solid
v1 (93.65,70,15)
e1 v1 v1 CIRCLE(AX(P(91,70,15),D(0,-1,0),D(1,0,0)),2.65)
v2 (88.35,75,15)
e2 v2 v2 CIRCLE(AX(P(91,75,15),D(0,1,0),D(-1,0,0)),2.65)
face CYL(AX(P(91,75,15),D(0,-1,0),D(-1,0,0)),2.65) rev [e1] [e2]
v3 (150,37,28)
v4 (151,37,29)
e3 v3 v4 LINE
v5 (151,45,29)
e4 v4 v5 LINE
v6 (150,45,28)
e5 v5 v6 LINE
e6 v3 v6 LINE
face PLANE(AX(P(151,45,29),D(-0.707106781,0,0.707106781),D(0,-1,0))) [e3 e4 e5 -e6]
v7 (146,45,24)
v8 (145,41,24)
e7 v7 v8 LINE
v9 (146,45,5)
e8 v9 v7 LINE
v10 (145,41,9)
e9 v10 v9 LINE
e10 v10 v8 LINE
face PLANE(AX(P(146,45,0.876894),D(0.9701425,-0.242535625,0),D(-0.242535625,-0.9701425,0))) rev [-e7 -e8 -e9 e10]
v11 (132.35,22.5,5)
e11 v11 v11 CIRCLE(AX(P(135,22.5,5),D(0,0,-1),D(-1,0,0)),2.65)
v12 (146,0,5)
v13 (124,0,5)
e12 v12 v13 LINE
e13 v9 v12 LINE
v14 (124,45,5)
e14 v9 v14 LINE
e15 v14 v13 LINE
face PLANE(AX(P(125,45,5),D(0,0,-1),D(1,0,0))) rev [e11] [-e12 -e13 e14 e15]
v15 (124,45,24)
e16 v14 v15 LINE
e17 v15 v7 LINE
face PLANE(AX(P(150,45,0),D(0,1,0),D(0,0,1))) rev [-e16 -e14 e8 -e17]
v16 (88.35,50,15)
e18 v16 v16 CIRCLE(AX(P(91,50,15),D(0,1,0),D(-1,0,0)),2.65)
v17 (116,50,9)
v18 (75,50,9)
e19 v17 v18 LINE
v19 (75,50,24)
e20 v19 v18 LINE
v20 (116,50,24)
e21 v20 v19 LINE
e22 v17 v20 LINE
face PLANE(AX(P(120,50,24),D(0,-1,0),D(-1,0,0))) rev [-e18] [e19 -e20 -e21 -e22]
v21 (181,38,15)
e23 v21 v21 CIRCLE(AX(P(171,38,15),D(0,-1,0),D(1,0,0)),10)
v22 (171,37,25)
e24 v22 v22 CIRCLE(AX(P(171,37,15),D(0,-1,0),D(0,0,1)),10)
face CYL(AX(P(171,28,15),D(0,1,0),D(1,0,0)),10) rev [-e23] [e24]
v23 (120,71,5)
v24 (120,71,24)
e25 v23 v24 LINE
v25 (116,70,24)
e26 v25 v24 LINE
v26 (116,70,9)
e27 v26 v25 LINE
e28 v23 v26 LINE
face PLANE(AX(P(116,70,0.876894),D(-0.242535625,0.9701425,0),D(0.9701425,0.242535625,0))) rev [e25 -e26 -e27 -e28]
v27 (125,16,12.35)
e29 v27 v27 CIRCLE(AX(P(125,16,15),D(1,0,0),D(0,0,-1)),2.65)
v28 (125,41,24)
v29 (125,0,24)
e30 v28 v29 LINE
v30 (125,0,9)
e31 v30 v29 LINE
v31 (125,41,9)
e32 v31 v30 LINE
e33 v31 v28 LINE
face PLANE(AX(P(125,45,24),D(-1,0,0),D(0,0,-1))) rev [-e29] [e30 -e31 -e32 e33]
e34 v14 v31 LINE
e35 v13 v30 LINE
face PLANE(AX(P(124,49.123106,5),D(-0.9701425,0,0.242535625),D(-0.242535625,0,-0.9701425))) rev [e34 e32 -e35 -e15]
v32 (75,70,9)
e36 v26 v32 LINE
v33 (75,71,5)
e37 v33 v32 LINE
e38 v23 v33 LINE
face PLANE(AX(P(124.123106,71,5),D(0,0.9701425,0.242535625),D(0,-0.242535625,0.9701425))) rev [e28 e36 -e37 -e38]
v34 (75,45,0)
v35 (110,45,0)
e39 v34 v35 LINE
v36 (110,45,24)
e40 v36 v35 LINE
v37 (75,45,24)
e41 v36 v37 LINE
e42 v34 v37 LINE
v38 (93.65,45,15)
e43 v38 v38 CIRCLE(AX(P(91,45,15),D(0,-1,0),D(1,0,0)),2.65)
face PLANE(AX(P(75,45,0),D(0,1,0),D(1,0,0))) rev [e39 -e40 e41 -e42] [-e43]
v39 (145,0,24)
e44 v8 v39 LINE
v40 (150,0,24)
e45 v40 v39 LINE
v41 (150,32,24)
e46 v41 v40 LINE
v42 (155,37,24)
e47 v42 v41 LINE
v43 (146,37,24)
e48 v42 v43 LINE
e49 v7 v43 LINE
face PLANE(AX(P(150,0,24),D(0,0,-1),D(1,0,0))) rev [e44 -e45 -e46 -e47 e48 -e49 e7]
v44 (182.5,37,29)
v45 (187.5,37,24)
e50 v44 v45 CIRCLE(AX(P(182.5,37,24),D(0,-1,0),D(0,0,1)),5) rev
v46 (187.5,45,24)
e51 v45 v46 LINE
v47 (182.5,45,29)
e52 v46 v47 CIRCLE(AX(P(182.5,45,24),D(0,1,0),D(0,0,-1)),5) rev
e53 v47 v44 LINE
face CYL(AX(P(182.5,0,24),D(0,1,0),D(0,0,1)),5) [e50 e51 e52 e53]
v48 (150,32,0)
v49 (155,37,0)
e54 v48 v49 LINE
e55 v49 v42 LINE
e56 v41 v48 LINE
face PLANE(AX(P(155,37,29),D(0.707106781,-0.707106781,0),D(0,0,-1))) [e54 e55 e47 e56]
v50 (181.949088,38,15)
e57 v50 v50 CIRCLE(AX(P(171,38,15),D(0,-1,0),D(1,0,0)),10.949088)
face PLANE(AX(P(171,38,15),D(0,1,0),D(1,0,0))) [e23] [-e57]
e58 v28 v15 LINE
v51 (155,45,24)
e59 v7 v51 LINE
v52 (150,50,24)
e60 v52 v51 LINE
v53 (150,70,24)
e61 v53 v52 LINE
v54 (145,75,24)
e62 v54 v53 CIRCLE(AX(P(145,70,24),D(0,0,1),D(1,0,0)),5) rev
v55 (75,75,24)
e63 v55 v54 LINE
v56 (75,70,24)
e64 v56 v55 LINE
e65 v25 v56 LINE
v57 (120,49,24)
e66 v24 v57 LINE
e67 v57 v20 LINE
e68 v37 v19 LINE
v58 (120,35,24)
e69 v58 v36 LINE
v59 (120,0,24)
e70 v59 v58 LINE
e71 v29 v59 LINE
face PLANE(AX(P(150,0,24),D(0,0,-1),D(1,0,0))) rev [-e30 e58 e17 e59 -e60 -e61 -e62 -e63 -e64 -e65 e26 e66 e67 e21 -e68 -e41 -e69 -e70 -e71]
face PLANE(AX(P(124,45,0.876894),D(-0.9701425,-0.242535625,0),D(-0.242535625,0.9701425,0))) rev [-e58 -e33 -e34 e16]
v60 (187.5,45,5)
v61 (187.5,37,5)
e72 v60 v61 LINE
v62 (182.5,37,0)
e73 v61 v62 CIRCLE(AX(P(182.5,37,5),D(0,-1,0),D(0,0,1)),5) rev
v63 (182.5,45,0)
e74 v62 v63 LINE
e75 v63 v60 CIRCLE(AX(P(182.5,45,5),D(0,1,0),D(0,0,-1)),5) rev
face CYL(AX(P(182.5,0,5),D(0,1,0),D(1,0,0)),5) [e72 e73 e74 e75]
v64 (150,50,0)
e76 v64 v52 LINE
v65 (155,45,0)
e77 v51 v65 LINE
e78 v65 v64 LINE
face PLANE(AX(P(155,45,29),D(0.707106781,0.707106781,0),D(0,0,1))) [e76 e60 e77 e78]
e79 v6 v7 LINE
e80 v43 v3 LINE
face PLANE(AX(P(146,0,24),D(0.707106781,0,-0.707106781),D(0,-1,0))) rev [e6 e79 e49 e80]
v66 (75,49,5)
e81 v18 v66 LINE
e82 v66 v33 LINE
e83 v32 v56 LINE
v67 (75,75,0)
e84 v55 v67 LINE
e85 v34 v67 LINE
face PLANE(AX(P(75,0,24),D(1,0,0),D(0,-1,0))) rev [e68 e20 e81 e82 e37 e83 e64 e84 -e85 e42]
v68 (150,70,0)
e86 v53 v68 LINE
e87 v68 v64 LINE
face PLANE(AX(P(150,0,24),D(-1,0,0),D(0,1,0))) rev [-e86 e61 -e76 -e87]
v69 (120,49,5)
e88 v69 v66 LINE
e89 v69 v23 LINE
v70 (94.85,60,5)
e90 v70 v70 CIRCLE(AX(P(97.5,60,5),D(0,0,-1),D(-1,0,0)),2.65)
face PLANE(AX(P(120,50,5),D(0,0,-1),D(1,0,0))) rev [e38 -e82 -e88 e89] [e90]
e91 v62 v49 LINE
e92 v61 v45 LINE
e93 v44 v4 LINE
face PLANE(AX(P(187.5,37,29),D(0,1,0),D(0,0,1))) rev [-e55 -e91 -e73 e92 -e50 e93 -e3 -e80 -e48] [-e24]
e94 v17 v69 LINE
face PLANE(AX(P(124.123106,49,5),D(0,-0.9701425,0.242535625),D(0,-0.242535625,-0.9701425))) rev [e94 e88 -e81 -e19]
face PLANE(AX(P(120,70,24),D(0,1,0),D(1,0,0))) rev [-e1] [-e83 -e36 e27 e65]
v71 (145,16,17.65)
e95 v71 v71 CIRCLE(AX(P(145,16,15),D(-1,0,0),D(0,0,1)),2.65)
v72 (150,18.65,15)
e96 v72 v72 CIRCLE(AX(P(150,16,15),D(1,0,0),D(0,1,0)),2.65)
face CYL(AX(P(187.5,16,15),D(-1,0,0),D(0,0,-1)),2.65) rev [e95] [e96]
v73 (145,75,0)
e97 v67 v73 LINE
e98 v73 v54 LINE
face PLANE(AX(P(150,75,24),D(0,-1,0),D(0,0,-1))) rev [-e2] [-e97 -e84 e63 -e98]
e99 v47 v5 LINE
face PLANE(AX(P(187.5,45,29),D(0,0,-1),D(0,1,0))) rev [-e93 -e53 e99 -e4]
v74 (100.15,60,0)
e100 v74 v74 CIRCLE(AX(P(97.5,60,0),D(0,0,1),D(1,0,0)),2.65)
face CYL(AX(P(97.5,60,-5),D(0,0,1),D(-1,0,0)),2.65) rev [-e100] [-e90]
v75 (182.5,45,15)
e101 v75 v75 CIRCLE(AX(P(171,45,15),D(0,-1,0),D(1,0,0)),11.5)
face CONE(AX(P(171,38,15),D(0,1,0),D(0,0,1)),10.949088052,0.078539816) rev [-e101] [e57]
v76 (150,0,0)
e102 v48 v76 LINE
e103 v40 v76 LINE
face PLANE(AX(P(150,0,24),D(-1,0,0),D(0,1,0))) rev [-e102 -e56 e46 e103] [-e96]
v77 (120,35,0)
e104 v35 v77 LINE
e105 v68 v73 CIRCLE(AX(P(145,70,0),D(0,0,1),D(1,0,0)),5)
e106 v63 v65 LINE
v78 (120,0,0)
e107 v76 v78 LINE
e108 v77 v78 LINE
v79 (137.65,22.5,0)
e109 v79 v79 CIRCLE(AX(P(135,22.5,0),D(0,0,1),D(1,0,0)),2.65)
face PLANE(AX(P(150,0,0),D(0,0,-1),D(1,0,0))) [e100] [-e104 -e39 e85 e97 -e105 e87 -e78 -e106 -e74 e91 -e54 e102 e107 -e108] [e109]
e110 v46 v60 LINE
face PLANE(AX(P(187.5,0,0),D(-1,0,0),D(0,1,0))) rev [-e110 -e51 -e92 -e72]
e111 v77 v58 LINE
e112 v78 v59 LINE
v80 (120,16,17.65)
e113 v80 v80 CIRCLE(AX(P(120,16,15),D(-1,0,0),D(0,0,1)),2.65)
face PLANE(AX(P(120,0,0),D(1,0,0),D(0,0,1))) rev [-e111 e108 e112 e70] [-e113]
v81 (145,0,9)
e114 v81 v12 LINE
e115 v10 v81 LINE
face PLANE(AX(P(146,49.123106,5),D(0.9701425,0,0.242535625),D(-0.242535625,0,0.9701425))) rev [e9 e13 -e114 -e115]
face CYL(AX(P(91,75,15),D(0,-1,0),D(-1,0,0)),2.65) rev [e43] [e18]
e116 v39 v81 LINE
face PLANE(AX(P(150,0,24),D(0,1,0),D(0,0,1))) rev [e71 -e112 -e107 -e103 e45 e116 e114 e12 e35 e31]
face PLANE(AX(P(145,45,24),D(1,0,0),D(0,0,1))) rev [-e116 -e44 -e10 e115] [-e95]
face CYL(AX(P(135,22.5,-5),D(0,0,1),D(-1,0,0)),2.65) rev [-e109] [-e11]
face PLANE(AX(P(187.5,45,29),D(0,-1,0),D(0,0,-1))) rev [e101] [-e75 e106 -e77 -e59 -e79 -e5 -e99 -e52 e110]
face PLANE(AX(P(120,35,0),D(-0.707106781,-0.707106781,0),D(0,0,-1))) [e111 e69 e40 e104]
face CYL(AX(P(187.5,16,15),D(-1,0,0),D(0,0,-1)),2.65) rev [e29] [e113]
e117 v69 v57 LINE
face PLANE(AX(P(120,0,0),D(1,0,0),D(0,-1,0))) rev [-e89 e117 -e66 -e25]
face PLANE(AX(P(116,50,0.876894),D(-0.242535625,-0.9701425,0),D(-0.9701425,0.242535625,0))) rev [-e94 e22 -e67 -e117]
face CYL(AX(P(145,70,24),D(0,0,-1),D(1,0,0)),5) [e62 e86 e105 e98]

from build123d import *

# Parameters (mm, degrees)
SKETCH1_W               = 75
SKETCH1_H               = 75
BOSS_EXTRUDE1_DEPTH     = 24
SKETCH2_W               = 20
SKETCH2_H               = 19
CUT_EXTRUDE1_DEPTH      = 45
SKETCH3_W               = 19
SKETCH3_H               = 20
CUT_EXTRUDE2_DEPTH      = 45
CUT_EXTRUDE3_DEPTH      = 109.747413762
CUT_EXTRUDE3_DEPTH_BACK = 109.747413762
SKETCH4_W               = 45
SKETCH4_H               = 45
FILLET1_R               = 5
CHAMFER1_SIZE           = 10
SKETCH5_W               = 29
SKETCH5_H               = 8
BOSS_EXTRUDE2_DEPTH     = 37.5
SKETCH6_R               = 11.5
CUT_EXTRUDE4_DEPTH      = 7
FILLET2_R               = 5
CHAMFER3_SIZE           = 5
CUT_EXTRUDE5_DEPTH      = 93.146622293
CUT_EXTRUDE5_DEPTH_BACK = 93.146622293
SKETCH7_R               = 2.65
CUT_EXTRUDE6_DEPTH      = 105.986903945
CUT_EXTRUDE6_DEPTH_BACK = 105.986903945
SKETCH8_R               = 2.65
SKETCH9_R               = 2.65
CUT_EXTRUDE7_DEPTH      = 10
SKETCH10_R              = 2.65
CUT_EXTRUDE8_DEPTH      = 10
CUT_EXTRUDE12_DEPTH     = 19
CUT_EXTRUDE13_REACH     = 111.959
CUT_EXTRUDE14_REACH     = 140.283
SKETCH14_R              = 10
CUT_EXTRUDE15_DEPTH     = 10
CHAMFER5_SIZE           = 4
CHAMFER6_SIZE           = 1
CHAMFER8_SIZE2          = 0.550911948
CHAMFER8_SIZE           = 7


with BuildPart() as part:
    # Sketch1 → Boss-Extrude1 (new body)
    with BuildSketch(Plane.XY):
        with Locations((37.5, 37.5)):
            Rectangle(SKETCH1_W, SKETCH1_H)
    extrude(amount=BOSS_EXTRUDE1_DEPTH)

    # Sketch2 → Cut-Extrude1 (cut)
    with BuildSketch(Plane.XZ):
        with Locations((15, 14.5)):
            Rectangle(SKETCH2_W, SKETCH2_H)
    extrude(amount=-CUT_EXTRUDE1_DEPTH, mode=Mode.SUBTRACT)

    # Sketch3 → Cut-Extrude2 (cut)
    with BuildSketch(Plane(origin=(75, 0, 0), x_dir=(0, 0, -1), z_dir=(1, 0, 0))):
        with Locations((-14.5, 60)):
            Rectangle(SKETCH3_W, SKETCH3_H)
    extrude(amount=-CUT_EXTRUDE2_DEPTH, mode=Mode.SUBTRACT)

    # Sketch4 → Cut-Extrude3 (cut, two sides: drawn at the far end of the back side and taken through both)
    with BuildSketch(Plane.XY.offset(24).offset(-CUT_EXTRUDE3_DEPTH_BACK)):
        with Locations((52.5, 22.5)):
            Rectangle(SKETCH4_W, SKETCH4_H)
    extrude(amount=CUT_EXTRUDE3_DEPTH + CUT_EXTRUDE3_DEPTH_BACK, mode=Mode.SUBTRACT)

    # Fillet1
    fillet1_edges = [part.edges().sort_by_distance(p)[0] for p in [
        (0, 75, 12),
    ]]
    fillet(fillet1_edges, radius=FILLET1_R)

    # Chamfer1
    chamfer1_edges = [part.edges().sort_by_distance(p)[0] for p in [
        (30, 45, 12),
    ]]
    chamfer(chamfer1_edges, length=CHAMFER1_SIZE)

    # Sketch5 → Boss-Extrude2 (add)
    with BuildSketch(Plane.ZY):
        with Locations((14.5, 41)):
            Rectangle(SKETCH5_W, SKETCH5_H)
    extrude(amount=BOSS_EXTRUDE2_DEPTH)

    # Sketch6 → Cut-Extrude4 (cut)
    with BuildSketch(Plane(origin=(0, 45, 0), x_dir=(1, 0, 0), z_dir=(0, 1, 0))):
        with Locations(Location((-21, -15.000000001, 0), (0, 0, 180))):
            Circle(SKETCH6_R)
    extrude(amount=-CUT_EXTRUDE4_DEPTH, mode=Mode.SUBTRACT)

    # Fillet2
    fillet2_edges = [part.edges().sort_by_distance(p)[0] for p in [
        (-37.5, 41, 29),
        (-37.5, 41, 0),
    ]]
    fillet(fillet2_edges, radius=FILLET2_R)

    # Chamfer3
    chamfer3_edges = [part.edges().sort_by_distance(p)[0] for p in [
        (0, 45, 12),
        (0, 37, 12),
    ]]
    chamfer(chamfer3_edges, length=CHAMFER3_SIZE)

    # Sketch7 → Cut-Extrude5 (cut, two sides: drawn at the far end of the back side and taken through both)
    with BuildSketch(Plane.XZ.offset(-45).offset(-CUT_EXTRUDE5_DEPTH_BACK)):
        with Locations((59, 15)):
            Circle(SKETCH7_R)
    extrude(amount=CUT_EXTRUDE5_DEPTH + CUT_EXTRUDE5_DEPTH_BACK, mode=Mode.SUBTRACT)

    # Sketch8 → Cut-Extrude6 (cut, two sides: drawn at the far end of the back side and taken through both)
    with BuildSketch(Plane(origin=(30, 0, 0), x_dir=(0, 0, -1), z_dir=(1, 0, 0)).offset(-CUT_EXTRUDE6_DEPTH_BACK)):
        with Locations((-15, 16)):
            Circle(SKETCH8_R)
    extrude(amount=CUT_EXTRUDE6_DEPTH + CUT_EXTRUDE6_DEPTH_BACK, mode=Mode.SUBTRACT)

    # Sketch9 → Cut-Extrude7 (cut)
    with BuildSketch(Plane.XY.offset(5)):
        with Locations((15, 22.5)):
            Circle(SKETCH9_R)
    extrude(amount=-CUT_EXTRUDE7_DEPTH, mode=Mode.SUBTRACT)

    # Sketch10 → Cut-Extrude8 (cut)
    with BuildSketch(Plane.XY.offset(5)):
        with Locations((52.5, 60)):
            Circle(SKETCH10_R)
    extrude(amount=-CUT_EXTRUDE8_DEPTH, mode=Mode.SUBTRACT)

    # Sketch11 → Cut-Extrude12 (cut)
    with BuildSketch(Plane.XY.offset(24)):
        Polygon((34, 70), (30, 71), (30, 70), align=None)
        Polygon((30, 50), (34, 50), (30, 49), align=None)
        Polygon((26, 45), (25, 41), (25, 45), align=None)
        Polygon((5, 45), (4, 45), (5, 41), align=None)
    extrude(amount=-CUT_EXTRUDE12_DEPTH, mode=Mode.SUBTRACT)

    # Cut-Extrude13: up to this face of the body (flat: up to its plane)
    cut_extrude13_end = Plane(part.part.faces().sort_by_distance((15, 45, 14.5))[0])
    # Sketch12 → Cut-Extrude13 (cut, up to the picked face)
    with BuildSketch(Plane.XZ, mode=Mode.PRIVATE) as cut_extrude13_sk1:
        Polygon((5, 5), (4, 5), (5, 9), align=None)
    cut_extrude13_tool1 = split(extrude(cut_extrude13_sk1.sketch, amount=-CUT_EXTRUDE13_REACH, mode=Mode.PRIVATE), bisect_by=cut_extrude13_end, keep=Keep.BOTH, mode=Mode.PRIVATE)
    # Sketch12 → Cut-Extrude13 (cut, up to the picked face)
    with BuildSketch(Plane.XZ, mode=Mode.PRIVATE) as cut_extrude13_sk2:
        Polygon((25, 5), (26, 5), (25, 9), align=None)
    cut_extrude13_tool2 = split(extrude(cut_extrude13_sk2.sketch, amount=-CUT_EXTRUDE13_REACH, mode=Mode.PRIVATE), bisect_by=cut_extrude13_end, keep=Keep.BOTH, mode=Mode.PRIVATE)
    add(cut_extrude13_tool1.solids().sort_by(Axis((4.666667, 0, 6.333333), (0, 1, 0)))[0], mode=Mode.SUBTRACT)
    add(cut_extrude13_tool2.solids().sort_by(Axis((25.333333, 0, 6.333333), (0, 1, 0)))[0], mode=Mode.SUBTRACT)

    # Cut-Extrude14: up to this face of the body (flat: up to its plane)
    cut_extrude14_end = Plane(part.part.faces().sort_by_distance((30, 60, 14.5))[0])
    # Sketch13 → Cut-Extrude14 (cut, up to the picked face)
    with BuildSketch(Plane(origin=(75, 0, 0), x_dir=(0, 0, -1), z_dir=(1, 0, 0)), mode=Mode.PRIVATE) as cut_extrude14_sk1:
        Polygon((-5, 50), (-5, 49), (-9, 50), align=None)
    cut_extrude14_tool1 = split(extrude(cut_extrude14_sk1.sketch, amount=-CUT_EXTRUDE14_REACH, mode=Mode.PRIVATE), bisect_by=cut_extrude14_end, keep=Keep.BOTH, mode=Mode.PRIVATE)
    # Sketch13 → Cut-Extrude14 (cut, up to the picked face)
    with BuildSketch(Plane(origin=(75, 0, 0), x_dir=(0, 0, -1), z_dir=(1, 0, 0)), mode=Mode.PRIVATE) as cut_extrude14_sk2:
        Polygon((-5, 70), (-5, 71), (-9, 70), align=None)
    cut_extrude14_tool2 = split(extrude(cut_extrude14_sk2.sketch, amount=-CUT_EXTRUDE14_REACH, mode=Mode.PRIVATE), bisect_by=cut_extrude14_end, keep=Keep.BOTH, mode=Mode.PRIVATE)
    add(cut_extrude14_tool1.solids().sort_by(Axis((75, 49.666667, 6.333333), (-1, 0, 0)))[0], mode=Mode.SUBTRACT)
    add(cut_extrude14_tool2.solids().sort_by(Axis((75, 70.333333, 6.333333), (-1, 0, 0)))[0], mode=Mode.SUBTRACT)

    # Sketch14 → Cut-Extrude15 (cut)
    with BuildSketch(Plane(origin=(0, 38, 0), x_dir=(1, 0, 0), z_dir=(0, 1, 0))):
        with Locations(Location((-21, -15.000000001, 0), (0, 0, 180))):
            Circle(SKETCH14_R)
    extrude(amount=-CUT_EXTRUDE15_DEPTH, mode=Mode.SUBTRACT)

    # Chamfer5
    chamfer5_edges = [part.edges().sort_by_distance(p)[0] for p in [
        (0, 41, 24),
    ]]
    chamfer(chamfer5_edges, length=CHAMFER5_SIZE)

    # Chamfer6
    chamfer6_edges = [part.edges().sort_by_distance(p)[0] for p in [
        (0, 41, 29),
    ]]
    chamfer(chamfer6_edges, length=CHAMFER6_SIZE - 0.0001)  # a hair under: the kernel refuses the full size

    # Chamfer8
    chamfer8_edges = [part.edges().sort_by_distance(p)[0] for p in [
        (-9.5, 38, 15.000000001),
    ]]
    chamfer8_side = [part.faces().sort_by_distance(p)[0] for p in [
        (-9.5, 38.011018239, 15.000000001),
    ]]
    chamfer(chamfer8_edges, length=CHAMFER8_SIZE - 0.0001, length2=CHAMFER8_SIZE2 - 0.0001, reference=chamfer8_side[0])  # a hair under: the kernel refuses the full size


with BuildPart() as body_2:
    # Mirror1: mirrored copy
    add(part.part.mirror(Plane(origin=(75, 0, 24), x_dir=(0, 0, 1), z_dir=(-1, 0, 0))))


solid = body_2.part
